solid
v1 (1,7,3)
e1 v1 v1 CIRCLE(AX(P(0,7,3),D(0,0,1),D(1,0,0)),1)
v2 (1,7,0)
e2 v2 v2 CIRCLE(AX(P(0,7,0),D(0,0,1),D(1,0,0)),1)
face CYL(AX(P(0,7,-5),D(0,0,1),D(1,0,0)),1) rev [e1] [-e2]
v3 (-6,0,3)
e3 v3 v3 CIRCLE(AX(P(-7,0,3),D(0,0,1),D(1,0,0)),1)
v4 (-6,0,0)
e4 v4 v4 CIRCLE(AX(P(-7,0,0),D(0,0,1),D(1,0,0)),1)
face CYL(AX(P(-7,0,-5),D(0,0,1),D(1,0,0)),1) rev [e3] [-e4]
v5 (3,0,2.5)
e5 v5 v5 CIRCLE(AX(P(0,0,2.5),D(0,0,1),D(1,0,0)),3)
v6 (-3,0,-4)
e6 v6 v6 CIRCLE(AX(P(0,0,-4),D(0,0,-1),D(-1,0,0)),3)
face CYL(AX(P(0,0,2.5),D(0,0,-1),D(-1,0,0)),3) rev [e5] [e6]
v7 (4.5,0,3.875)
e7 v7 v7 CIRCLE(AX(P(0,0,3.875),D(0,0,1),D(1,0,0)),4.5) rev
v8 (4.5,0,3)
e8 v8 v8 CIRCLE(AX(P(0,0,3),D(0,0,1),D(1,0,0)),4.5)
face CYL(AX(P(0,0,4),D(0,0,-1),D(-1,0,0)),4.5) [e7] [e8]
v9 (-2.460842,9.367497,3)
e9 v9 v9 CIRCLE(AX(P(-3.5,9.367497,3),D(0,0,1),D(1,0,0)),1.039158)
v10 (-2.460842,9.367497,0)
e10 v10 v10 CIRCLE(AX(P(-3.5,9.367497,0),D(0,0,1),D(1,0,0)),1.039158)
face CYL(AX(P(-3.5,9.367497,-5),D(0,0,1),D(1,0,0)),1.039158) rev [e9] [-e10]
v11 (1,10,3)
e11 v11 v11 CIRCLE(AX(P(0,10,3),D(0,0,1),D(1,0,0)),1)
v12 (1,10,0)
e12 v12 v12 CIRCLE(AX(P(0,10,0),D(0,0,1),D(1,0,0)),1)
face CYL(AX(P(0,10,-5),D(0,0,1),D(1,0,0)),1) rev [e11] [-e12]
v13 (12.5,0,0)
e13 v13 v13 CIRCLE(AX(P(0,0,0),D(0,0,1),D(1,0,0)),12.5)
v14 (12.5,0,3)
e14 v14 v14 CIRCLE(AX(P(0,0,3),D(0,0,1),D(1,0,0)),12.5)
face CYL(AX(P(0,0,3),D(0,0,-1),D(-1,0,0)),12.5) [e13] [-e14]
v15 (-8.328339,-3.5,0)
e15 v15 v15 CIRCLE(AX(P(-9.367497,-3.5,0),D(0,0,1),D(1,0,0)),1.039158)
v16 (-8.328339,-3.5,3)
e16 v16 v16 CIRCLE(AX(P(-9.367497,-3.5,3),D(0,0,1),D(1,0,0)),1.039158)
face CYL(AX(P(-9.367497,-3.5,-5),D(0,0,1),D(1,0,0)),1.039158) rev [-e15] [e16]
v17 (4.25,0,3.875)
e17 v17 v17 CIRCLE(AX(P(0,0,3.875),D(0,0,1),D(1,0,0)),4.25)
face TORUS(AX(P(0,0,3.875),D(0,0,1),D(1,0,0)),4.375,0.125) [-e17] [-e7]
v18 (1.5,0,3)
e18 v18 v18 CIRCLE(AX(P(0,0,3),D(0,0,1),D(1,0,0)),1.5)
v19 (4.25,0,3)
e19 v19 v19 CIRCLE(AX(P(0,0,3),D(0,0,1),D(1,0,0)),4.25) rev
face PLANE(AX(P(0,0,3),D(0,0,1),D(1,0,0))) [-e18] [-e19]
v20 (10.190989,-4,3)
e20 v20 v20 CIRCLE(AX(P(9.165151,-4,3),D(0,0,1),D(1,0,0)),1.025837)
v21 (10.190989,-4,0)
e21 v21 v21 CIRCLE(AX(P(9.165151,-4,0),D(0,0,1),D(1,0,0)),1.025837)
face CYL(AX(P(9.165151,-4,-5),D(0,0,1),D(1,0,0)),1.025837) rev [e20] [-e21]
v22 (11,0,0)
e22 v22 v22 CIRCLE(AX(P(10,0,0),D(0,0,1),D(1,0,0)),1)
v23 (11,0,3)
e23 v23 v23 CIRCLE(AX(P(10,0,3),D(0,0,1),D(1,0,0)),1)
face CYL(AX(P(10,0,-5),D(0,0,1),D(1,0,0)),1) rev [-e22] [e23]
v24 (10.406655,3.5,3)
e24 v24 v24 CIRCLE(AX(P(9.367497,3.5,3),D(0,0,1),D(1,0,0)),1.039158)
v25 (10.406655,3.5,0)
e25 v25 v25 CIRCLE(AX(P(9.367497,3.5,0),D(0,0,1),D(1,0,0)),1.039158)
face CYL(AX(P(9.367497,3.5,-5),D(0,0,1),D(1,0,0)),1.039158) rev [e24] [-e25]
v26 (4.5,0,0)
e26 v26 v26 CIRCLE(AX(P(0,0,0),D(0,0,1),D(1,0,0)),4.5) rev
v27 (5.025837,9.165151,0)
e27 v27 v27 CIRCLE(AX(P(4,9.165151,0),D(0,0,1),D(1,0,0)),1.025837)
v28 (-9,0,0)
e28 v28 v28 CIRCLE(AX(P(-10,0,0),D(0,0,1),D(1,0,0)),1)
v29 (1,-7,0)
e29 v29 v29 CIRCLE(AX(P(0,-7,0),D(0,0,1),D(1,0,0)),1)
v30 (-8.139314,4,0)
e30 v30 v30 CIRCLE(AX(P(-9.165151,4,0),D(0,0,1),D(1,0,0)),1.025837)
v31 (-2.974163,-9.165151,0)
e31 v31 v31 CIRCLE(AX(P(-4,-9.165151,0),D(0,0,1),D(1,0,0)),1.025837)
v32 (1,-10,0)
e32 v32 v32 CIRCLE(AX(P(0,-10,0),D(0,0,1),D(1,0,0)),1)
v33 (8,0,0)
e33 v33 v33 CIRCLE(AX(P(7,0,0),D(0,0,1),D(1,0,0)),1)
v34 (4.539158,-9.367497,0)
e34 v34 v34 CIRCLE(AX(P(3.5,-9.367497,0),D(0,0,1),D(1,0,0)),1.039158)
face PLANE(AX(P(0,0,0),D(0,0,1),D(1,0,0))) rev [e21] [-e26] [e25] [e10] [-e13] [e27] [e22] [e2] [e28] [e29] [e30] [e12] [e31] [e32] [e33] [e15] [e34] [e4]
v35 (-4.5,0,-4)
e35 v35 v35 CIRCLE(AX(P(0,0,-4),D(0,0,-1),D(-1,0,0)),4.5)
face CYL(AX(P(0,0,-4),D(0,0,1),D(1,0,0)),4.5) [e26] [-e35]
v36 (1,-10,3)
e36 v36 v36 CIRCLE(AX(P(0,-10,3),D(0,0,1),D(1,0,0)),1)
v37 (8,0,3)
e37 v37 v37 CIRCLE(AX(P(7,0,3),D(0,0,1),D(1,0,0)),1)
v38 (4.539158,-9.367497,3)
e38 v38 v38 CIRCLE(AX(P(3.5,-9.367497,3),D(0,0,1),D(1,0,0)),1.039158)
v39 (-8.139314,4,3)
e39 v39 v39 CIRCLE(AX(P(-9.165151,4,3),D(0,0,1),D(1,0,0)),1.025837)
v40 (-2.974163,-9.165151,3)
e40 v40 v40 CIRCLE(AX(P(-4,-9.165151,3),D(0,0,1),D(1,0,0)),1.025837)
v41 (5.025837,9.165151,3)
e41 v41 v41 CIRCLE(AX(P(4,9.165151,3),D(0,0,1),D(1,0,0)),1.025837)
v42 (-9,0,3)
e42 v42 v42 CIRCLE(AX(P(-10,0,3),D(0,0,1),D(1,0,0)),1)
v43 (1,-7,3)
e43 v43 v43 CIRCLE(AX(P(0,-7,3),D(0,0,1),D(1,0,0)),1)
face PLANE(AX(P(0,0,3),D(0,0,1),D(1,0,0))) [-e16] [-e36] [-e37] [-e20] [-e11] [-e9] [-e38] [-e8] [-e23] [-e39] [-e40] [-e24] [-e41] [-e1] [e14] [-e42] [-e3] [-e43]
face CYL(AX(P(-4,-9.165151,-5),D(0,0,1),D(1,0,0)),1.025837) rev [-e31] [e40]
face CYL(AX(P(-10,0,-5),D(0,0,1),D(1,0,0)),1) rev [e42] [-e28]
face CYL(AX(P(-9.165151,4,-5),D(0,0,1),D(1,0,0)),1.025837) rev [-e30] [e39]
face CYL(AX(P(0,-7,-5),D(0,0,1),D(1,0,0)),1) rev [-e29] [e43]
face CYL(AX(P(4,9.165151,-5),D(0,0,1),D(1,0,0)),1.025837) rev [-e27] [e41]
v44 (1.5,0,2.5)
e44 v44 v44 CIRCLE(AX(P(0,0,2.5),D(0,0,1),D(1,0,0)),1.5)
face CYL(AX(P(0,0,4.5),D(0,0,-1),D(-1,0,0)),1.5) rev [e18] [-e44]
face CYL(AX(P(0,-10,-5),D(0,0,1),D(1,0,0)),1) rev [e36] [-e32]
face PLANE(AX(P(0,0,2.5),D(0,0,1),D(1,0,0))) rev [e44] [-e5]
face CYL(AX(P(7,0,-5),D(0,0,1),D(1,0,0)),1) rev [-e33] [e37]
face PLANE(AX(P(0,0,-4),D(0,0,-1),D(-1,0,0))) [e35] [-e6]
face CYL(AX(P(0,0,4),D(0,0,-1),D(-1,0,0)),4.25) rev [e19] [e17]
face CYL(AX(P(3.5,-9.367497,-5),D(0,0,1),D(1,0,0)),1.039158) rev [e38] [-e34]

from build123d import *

# Parameters (mm, degrees)
ESQUISSE1_R             = 12.5
BOSS_EXTRU_2_DEPTH      = 3
ESQUISSE2_R             = 3
ENL_V_MAT_EXTRU_1_DEPTH = 2.5
ESQUISSE3_R             = 1.5
ENL_V_MAT_EXTRU_2_DEPTH = 4.5
BOSS_EXTRU_3_START      = 4
ESQUISSE5_R             = 4.5
ESQUISSE5_R_2           = 3
BOSS_EXTRU_3_DEPTH      = 4
ESQUISSE6_R             = 4.5
ESQUISSE6_R_2           = 4.25
BOSS_EXTRU_4_DEPTH      = 1
CONG_1_R                = 0.125
ESQUISSE7_R             = 1
ESQUISSE7_R_2           = 1.025837193
ESQUISSE7_R_3           = 1.039157515
ENL_V_MAT_EXTRU_3_DEPTH = 8


with BuildPart() as part:
    # Esquisse1 → Boss.-Extru.2 (new body)
    with BuildSketch(Plane.XY):
        Circle(ESQUISSE1_R)
    extrude(amount=BOSS_EXTRU_2_DEPTH)

    # Esquisse2 → Enlèv. mat.-Extru.1 (cut)
    with BuildSketch(Plane.XY):
        Circle(ESQUISSE2_R)
    extrude(amount=ENL_V_MAT_EXTRU_1_DEPTH, mode=Mode.SUBTRACT)

    # Esquisse3 → Enlèv. mat.-Extru.2 (cut)
    with BuildSketch(Plane(origin=(0, 0, 0), x_dir=(-1, 0, 0), z_dir=(0, 0, -1))):
        with Locations(Location((0, 0, 0), (0, 0, 180))):
            Circle(ESQUISSE3_R)
    extrude(amount=-ENL_V_MAT_EXTRU_2_DEPTH, mode=Mode.SUBTRACT)

    # Esquisse5 → Boss.-Extru.3 (add)
    with BuildSketch(Plane(origin=(0, 0, 0), x_dir=(-1, 0, 0), z_dir=(0, 0, -1)).offset(BOSS_EXTRU_3_START)):
        with Locations(Location((0, 0, 0), (0, 0, 180))):
            Circle(ESQUISSE5_R)
        Circle(ESQUISSE5_R_2, mode=Mode.SUBTRACT)
    extrude(amount=-BOSS_EXTRU_3_DEPTH)

    # Esquisse6 → Boss.-Extru.4 (add)
    with BuildSketch(Plane.XY.offset(3)):
        Circle(ESQUISSE6_R)
        Circle(ESQUISSE6_R_2, mode=Mode.SUBTRACT)
    extrude(amount=BOSS_EXTRU_4_DEPTH)

    # Congé1
    cong_1_edges = [part.edges().sort_by_distance(p)[0] for p in [
        (-4.5, 0, 4),
        (-4.25, 0, 4),
    ]]
    fillet(cong_1_edges, radius=CONG_1_R - 0.0001)  # a hair under: the kernel refuses the full size

    # Esquisse7 → Enlèv. mat.-Extru.3 (cut)
    with BuildSketch(Plane.XY.offset(3)):
        with Locations((0, 10)):
            Circle(ESQUISSE7_R)
        with Locations((0, 7)):
            Circle(ESQUISSE7_R)
        with Locations((4, 9.16515139)):
            Circle(ESQUISSE7_R_2)
        with Locations((-3.5, 9.367496998)):
            Circle(ESQUISSE7_R_3)
        with Locations((9.367496998, 3.5)):
            Circle(ESQUISSE7_R_3)
        with Locations((10, 0)):
            Circle(ESQUISSE7_R)
        with Locations((9.16515139, -4)):
            Circle(ESQUISSE7_R_2)
        with Locations((7, 0)):
            Circle(ESQUISSE7_R)
        with Locations((3.5, -9.367496998)):
            Circle(ESQUISSE7_R_3)
        with Locations((0, -10)):
            Circle(ESQUISSE7_R)
        with Locations((-4, -9.16515139)):
            Circle(ESQUISSE7_R_2)
        with Locations((0, -7)):
            Circle(ESQUISSE7_R)
        with Locations((-9.367496998, -3.5)):
            Circle(ESQUISSE7_R_3)
        with Locations((-10, 0)):
            Circle(ESQUISSE7_R)
        with Locations((-9.16515139, 4)):
            Circle(ESQUISSE7_R_2)
        with Locations((-7, 0)):
            Circle(ESQUISSE7_R)
    extrude(amount=-ENL_V_MAT_EXTRU_3_DEPTH, mode=Mode.SUBTRACT)


solid = part.part
